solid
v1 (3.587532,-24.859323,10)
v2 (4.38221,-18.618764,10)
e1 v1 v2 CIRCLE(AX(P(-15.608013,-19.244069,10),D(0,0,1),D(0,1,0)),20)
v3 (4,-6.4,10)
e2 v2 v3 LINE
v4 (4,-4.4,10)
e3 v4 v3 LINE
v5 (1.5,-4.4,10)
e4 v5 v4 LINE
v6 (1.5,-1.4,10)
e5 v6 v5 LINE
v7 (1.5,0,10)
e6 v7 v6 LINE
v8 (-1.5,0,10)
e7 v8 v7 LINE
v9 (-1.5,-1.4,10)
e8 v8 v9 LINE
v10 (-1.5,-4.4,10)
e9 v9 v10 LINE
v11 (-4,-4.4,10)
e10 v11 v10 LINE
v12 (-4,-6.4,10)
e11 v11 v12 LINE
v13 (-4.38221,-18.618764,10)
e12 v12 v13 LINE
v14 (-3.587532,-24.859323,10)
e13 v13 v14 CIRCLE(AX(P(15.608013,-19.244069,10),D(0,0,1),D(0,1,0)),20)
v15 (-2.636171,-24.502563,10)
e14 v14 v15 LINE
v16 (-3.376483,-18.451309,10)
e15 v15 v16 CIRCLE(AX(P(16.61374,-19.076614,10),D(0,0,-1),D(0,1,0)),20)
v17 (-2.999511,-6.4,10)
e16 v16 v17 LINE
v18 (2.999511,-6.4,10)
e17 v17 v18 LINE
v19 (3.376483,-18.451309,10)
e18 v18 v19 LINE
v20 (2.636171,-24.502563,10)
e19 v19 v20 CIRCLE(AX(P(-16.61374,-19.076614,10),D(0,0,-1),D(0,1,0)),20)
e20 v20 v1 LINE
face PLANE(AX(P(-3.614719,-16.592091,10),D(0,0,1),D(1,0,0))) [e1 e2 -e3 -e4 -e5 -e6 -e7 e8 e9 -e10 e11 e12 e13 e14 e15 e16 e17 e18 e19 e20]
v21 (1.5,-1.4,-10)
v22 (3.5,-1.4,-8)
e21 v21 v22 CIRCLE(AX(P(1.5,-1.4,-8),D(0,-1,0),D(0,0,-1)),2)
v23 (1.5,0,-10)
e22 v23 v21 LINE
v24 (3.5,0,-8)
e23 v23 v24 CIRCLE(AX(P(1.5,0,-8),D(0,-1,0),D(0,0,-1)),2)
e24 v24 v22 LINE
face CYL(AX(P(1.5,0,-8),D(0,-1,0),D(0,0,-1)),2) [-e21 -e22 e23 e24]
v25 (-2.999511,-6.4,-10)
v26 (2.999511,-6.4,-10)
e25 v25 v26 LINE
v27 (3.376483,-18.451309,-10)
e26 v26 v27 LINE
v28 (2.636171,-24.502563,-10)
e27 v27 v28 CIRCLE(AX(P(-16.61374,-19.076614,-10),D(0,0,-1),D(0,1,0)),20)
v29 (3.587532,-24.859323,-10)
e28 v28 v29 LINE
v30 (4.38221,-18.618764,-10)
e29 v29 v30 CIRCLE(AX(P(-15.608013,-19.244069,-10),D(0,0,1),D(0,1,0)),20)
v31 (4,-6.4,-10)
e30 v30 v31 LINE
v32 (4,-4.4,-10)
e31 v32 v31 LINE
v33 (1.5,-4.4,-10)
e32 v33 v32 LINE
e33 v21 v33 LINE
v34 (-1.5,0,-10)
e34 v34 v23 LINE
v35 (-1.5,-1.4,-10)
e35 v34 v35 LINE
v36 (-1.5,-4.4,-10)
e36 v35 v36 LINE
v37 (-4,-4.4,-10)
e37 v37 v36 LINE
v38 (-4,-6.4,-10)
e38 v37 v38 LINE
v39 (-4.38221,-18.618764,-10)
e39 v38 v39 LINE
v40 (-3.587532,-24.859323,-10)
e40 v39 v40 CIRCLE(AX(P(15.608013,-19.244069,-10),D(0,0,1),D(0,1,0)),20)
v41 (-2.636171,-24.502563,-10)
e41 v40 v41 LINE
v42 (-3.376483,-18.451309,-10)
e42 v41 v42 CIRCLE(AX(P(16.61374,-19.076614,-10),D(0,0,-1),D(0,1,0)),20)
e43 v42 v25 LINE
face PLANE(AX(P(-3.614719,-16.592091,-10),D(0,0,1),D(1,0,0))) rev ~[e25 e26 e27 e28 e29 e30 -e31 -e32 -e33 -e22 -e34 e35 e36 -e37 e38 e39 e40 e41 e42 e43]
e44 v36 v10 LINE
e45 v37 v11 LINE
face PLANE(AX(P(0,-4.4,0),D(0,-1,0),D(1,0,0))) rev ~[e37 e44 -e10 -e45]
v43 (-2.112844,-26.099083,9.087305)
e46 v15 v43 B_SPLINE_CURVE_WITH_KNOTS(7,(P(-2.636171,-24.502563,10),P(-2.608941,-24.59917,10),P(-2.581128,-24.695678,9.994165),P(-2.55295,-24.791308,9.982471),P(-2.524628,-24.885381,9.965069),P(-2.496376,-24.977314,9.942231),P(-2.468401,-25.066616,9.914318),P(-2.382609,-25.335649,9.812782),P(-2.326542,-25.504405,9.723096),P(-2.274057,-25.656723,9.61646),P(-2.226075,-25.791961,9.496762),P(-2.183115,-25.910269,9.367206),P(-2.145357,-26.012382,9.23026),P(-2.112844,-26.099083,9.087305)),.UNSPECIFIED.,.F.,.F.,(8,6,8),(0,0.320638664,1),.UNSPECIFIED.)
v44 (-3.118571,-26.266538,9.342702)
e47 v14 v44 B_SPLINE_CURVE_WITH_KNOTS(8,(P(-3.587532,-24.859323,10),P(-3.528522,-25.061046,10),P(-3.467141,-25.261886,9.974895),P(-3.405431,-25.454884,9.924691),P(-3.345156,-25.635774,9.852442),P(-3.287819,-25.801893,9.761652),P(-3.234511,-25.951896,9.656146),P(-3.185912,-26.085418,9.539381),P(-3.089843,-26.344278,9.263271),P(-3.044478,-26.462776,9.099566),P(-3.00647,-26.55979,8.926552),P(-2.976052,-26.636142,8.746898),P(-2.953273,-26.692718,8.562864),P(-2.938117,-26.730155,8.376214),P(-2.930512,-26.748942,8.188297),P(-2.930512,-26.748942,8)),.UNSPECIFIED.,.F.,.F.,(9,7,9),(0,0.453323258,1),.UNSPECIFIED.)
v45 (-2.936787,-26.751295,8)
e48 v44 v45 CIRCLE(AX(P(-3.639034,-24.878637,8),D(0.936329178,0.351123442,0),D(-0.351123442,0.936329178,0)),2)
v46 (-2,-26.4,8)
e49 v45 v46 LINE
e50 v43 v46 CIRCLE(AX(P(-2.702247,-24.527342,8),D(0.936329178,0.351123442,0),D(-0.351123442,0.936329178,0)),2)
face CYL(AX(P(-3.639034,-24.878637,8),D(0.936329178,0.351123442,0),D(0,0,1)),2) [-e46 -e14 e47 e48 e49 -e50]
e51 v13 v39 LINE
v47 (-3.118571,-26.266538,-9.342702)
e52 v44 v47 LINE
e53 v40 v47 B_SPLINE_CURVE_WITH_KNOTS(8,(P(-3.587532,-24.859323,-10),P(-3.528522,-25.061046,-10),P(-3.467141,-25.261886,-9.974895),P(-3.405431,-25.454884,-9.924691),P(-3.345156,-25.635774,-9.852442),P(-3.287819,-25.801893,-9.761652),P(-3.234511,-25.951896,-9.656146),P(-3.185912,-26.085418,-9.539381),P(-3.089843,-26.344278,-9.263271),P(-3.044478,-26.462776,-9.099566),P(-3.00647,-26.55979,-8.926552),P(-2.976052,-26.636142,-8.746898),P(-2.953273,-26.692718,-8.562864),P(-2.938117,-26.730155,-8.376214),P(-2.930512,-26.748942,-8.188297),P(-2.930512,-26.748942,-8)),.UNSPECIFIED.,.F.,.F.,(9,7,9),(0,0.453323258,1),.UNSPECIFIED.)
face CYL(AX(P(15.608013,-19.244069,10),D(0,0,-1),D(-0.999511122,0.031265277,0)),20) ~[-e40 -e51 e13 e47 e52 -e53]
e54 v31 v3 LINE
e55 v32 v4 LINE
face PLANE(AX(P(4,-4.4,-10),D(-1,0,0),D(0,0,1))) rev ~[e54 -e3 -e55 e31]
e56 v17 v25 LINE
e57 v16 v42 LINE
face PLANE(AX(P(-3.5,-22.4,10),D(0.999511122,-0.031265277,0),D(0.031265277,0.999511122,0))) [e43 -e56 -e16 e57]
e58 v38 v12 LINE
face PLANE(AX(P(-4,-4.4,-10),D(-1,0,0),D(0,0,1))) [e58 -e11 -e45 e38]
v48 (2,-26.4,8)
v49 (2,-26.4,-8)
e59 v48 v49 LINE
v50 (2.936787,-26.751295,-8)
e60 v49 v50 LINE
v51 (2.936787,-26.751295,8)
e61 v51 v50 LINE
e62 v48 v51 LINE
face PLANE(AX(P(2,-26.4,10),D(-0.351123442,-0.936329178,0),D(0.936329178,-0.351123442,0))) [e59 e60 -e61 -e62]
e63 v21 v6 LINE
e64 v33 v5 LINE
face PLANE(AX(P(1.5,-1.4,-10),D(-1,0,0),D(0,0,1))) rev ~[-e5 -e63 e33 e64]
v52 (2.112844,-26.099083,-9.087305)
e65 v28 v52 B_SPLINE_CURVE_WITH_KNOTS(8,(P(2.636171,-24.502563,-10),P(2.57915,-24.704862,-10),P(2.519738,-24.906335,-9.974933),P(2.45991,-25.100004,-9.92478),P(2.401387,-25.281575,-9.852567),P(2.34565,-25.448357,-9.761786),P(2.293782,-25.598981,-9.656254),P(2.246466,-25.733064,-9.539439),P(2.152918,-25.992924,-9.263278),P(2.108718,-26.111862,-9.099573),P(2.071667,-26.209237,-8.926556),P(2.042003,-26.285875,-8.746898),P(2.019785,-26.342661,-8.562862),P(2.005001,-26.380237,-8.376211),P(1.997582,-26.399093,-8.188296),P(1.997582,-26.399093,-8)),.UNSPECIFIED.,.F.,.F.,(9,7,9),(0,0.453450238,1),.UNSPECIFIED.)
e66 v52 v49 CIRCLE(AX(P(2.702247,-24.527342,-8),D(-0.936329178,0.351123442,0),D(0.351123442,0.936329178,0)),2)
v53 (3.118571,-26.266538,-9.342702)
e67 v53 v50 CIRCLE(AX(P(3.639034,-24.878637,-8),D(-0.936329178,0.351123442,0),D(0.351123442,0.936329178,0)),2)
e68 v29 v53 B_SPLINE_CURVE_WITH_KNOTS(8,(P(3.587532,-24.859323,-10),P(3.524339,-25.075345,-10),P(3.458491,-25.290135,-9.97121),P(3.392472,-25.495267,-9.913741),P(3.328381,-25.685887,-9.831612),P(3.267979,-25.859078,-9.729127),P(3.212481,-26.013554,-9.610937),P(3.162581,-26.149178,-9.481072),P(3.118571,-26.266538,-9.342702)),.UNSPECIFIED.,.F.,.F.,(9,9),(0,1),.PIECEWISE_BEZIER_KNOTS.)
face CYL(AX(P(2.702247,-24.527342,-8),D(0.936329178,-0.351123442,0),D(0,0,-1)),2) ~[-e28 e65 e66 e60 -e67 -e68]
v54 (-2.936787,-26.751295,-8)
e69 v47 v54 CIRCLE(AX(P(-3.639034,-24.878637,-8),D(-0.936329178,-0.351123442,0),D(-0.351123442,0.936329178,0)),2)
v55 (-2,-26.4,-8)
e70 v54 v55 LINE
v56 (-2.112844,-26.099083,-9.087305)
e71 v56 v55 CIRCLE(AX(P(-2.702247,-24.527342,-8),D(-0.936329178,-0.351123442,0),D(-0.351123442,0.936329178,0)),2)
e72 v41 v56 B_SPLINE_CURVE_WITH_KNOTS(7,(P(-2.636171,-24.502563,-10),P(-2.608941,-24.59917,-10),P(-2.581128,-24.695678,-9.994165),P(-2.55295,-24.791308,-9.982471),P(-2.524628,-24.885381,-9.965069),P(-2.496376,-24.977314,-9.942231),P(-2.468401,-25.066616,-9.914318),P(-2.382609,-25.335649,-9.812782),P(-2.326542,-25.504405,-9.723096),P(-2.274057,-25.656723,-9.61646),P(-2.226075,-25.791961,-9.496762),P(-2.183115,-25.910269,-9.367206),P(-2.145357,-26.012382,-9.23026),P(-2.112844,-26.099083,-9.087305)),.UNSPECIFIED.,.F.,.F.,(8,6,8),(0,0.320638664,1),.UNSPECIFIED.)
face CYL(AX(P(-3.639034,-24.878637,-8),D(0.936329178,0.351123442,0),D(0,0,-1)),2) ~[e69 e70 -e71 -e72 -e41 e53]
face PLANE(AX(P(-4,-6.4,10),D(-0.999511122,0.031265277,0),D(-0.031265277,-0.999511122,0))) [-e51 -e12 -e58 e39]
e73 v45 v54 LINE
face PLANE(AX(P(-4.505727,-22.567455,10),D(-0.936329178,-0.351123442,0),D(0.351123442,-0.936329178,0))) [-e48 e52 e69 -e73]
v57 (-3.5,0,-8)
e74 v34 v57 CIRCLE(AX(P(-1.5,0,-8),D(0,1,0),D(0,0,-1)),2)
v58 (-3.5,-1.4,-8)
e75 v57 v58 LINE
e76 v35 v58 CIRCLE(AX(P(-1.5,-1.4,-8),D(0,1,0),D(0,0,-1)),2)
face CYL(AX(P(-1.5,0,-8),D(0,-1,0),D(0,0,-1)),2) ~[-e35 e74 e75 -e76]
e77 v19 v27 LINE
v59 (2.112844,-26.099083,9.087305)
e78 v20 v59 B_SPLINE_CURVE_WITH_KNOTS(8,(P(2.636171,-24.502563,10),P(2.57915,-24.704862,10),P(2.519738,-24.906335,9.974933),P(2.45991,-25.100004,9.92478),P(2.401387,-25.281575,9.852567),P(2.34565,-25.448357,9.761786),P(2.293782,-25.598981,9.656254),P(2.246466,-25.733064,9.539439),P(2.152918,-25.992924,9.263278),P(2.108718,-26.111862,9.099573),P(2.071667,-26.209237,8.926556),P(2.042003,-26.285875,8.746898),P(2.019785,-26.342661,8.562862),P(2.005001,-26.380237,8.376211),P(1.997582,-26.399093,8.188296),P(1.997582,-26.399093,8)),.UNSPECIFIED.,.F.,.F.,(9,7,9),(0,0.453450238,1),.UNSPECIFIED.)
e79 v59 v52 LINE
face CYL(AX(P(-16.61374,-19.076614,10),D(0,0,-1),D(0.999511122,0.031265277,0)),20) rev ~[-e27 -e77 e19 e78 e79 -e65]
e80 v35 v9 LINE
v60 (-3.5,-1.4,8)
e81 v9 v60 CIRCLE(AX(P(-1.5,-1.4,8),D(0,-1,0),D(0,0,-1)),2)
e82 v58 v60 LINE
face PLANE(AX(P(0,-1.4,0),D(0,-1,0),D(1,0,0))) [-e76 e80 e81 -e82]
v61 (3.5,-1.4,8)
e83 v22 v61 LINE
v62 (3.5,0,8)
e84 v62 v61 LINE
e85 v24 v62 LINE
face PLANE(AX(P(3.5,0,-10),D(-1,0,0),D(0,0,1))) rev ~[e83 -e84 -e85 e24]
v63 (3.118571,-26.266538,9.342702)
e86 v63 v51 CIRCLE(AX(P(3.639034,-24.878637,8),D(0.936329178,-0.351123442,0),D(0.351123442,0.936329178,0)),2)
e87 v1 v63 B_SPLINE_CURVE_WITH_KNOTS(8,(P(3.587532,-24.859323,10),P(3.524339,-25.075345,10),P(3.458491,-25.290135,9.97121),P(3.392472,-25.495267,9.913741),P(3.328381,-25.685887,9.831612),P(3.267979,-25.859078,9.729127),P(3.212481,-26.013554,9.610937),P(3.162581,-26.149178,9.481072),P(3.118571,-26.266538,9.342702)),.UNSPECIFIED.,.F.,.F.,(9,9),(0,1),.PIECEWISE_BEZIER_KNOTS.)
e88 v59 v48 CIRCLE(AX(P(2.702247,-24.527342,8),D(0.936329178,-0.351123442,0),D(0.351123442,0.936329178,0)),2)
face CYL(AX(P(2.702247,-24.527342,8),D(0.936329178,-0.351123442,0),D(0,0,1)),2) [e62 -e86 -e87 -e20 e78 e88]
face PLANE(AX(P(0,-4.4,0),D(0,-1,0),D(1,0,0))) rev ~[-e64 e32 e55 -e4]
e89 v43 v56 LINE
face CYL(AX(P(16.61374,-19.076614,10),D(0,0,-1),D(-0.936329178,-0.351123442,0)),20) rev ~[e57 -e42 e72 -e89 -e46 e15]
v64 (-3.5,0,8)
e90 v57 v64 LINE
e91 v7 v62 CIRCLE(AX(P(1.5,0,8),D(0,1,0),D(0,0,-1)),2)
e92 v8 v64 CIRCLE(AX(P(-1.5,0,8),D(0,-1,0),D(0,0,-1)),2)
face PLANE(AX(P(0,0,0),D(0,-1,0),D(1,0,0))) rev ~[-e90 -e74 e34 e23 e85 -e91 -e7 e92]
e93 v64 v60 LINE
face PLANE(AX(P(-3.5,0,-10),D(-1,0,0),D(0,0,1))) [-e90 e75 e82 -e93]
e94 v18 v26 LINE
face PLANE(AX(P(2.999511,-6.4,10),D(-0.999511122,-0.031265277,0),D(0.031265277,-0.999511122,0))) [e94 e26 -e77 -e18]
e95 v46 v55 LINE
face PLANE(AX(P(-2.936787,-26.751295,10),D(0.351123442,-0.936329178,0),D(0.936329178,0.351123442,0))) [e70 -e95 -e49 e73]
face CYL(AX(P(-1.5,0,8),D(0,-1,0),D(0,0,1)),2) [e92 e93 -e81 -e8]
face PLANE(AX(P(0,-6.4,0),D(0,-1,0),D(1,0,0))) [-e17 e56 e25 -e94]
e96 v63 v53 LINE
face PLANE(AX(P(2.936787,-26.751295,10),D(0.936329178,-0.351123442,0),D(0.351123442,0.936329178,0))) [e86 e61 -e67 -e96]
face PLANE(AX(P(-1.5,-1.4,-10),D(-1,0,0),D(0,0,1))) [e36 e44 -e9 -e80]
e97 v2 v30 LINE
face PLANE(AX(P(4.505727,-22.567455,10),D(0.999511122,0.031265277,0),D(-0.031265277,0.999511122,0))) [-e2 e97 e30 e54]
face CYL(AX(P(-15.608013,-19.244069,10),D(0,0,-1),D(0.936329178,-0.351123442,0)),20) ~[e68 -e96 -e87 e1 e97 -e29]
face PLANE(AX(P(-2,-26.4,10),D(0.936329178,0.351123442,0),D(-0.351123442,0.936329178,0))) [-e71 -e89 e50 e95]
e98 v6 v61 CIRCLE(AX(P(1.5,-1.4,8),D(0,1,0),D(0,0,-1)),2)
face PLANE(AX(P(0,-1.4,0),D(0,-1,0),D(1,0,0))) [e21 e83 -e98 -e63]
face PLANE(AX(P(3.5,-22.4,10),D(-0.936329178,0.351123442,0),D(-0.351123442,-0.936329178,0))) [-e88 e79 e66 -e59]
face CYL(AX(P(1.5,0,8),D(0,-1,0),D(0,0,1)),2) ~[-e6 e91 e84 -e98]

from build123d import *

# Parameters (mm, degrees)
F0_W     = 7
F0_H     = 20
F1_DEPTH = 1.4
F2_W     = 3
F2_H     = 20
F3_DEPTH = 3
F4_W     = 8
F4_H     = 20
F5_DEPTH = 2
F8_DEPTH = 20
F9_R     = 20
F10_R    = 2


# Not quite as in the source:
# - a feature of the source that left no trace in its solid (it failed there, or was rolled back) is left out


with BuildPart() as f1:
    # F0 (on Front) → F1 (new body)
    with BuildSketch(Plane.XZ):
        Rectangle(F0_W, F0_H)
    extrude(amount=F1_DEPTH)

    # F2 (on face) → F3 (join)
    with BuildSketch(Plane.XZ.offset(1.4)):
        Rectangle(F2_W, F2_H)
    extrude(amount=F3_DEPTH)

    # F4 (on face) → F5 (join)
    with BuildSketch(Plane.XZ.offset(4.4)):
        Rectangle(F4_W, F4_H)
    extrude(amount=F5_DEPTH)

    # F7 (on face) → F8 (join, through all)
    with BuildSketch(Plane.XY.offset(10)):
        Polygon((-2.9995108826, -6.4), (-4, -6.4), (-4.5057272064, -22.5674550383), (-2.9367871525, -26.7512951822), (-2, -26.4), (-3.5, -22.4), align=None)
        Polygon((4, -6.4), (2.9995108826, -6.4), (3.5, -22.4), (2, -26.4), (2.9367871525, -26.7512951822), (4.5057272064, -22.5674550383), align=None)
    extrude(amount=-F8_DEPTH)

    # F9
    f9_edges = [f1.edges().sort_by_distance(p)[0] for p in [
        (-3.5, -22.4, 0),
        (3.5, -22.4, 0),
        (4.505727, -22.567455, 0),
        (-4.505727, -22.567455, 0),
    ]]
    fillet(f9_edges, radius=F9_R)

    # F10
    f10_edges = [f1.edges().sort_by_distance(p)[0] for p in [
        (-2.468394, -26.575648, 10),
        (2.468394, -26.575648, 10),
        (-2.468394, -26.575648, -10),
        (2.468394, -26.575648, -10),
        (-3.5, -0.7, -10),
        (3.5, -0.7, -10),
        (-3.5, -0.7, 10),
        (3.5, -0.7, 10),
    ]]
    fillet(f10_edges, radius=F10_R)


solid = f1.part
